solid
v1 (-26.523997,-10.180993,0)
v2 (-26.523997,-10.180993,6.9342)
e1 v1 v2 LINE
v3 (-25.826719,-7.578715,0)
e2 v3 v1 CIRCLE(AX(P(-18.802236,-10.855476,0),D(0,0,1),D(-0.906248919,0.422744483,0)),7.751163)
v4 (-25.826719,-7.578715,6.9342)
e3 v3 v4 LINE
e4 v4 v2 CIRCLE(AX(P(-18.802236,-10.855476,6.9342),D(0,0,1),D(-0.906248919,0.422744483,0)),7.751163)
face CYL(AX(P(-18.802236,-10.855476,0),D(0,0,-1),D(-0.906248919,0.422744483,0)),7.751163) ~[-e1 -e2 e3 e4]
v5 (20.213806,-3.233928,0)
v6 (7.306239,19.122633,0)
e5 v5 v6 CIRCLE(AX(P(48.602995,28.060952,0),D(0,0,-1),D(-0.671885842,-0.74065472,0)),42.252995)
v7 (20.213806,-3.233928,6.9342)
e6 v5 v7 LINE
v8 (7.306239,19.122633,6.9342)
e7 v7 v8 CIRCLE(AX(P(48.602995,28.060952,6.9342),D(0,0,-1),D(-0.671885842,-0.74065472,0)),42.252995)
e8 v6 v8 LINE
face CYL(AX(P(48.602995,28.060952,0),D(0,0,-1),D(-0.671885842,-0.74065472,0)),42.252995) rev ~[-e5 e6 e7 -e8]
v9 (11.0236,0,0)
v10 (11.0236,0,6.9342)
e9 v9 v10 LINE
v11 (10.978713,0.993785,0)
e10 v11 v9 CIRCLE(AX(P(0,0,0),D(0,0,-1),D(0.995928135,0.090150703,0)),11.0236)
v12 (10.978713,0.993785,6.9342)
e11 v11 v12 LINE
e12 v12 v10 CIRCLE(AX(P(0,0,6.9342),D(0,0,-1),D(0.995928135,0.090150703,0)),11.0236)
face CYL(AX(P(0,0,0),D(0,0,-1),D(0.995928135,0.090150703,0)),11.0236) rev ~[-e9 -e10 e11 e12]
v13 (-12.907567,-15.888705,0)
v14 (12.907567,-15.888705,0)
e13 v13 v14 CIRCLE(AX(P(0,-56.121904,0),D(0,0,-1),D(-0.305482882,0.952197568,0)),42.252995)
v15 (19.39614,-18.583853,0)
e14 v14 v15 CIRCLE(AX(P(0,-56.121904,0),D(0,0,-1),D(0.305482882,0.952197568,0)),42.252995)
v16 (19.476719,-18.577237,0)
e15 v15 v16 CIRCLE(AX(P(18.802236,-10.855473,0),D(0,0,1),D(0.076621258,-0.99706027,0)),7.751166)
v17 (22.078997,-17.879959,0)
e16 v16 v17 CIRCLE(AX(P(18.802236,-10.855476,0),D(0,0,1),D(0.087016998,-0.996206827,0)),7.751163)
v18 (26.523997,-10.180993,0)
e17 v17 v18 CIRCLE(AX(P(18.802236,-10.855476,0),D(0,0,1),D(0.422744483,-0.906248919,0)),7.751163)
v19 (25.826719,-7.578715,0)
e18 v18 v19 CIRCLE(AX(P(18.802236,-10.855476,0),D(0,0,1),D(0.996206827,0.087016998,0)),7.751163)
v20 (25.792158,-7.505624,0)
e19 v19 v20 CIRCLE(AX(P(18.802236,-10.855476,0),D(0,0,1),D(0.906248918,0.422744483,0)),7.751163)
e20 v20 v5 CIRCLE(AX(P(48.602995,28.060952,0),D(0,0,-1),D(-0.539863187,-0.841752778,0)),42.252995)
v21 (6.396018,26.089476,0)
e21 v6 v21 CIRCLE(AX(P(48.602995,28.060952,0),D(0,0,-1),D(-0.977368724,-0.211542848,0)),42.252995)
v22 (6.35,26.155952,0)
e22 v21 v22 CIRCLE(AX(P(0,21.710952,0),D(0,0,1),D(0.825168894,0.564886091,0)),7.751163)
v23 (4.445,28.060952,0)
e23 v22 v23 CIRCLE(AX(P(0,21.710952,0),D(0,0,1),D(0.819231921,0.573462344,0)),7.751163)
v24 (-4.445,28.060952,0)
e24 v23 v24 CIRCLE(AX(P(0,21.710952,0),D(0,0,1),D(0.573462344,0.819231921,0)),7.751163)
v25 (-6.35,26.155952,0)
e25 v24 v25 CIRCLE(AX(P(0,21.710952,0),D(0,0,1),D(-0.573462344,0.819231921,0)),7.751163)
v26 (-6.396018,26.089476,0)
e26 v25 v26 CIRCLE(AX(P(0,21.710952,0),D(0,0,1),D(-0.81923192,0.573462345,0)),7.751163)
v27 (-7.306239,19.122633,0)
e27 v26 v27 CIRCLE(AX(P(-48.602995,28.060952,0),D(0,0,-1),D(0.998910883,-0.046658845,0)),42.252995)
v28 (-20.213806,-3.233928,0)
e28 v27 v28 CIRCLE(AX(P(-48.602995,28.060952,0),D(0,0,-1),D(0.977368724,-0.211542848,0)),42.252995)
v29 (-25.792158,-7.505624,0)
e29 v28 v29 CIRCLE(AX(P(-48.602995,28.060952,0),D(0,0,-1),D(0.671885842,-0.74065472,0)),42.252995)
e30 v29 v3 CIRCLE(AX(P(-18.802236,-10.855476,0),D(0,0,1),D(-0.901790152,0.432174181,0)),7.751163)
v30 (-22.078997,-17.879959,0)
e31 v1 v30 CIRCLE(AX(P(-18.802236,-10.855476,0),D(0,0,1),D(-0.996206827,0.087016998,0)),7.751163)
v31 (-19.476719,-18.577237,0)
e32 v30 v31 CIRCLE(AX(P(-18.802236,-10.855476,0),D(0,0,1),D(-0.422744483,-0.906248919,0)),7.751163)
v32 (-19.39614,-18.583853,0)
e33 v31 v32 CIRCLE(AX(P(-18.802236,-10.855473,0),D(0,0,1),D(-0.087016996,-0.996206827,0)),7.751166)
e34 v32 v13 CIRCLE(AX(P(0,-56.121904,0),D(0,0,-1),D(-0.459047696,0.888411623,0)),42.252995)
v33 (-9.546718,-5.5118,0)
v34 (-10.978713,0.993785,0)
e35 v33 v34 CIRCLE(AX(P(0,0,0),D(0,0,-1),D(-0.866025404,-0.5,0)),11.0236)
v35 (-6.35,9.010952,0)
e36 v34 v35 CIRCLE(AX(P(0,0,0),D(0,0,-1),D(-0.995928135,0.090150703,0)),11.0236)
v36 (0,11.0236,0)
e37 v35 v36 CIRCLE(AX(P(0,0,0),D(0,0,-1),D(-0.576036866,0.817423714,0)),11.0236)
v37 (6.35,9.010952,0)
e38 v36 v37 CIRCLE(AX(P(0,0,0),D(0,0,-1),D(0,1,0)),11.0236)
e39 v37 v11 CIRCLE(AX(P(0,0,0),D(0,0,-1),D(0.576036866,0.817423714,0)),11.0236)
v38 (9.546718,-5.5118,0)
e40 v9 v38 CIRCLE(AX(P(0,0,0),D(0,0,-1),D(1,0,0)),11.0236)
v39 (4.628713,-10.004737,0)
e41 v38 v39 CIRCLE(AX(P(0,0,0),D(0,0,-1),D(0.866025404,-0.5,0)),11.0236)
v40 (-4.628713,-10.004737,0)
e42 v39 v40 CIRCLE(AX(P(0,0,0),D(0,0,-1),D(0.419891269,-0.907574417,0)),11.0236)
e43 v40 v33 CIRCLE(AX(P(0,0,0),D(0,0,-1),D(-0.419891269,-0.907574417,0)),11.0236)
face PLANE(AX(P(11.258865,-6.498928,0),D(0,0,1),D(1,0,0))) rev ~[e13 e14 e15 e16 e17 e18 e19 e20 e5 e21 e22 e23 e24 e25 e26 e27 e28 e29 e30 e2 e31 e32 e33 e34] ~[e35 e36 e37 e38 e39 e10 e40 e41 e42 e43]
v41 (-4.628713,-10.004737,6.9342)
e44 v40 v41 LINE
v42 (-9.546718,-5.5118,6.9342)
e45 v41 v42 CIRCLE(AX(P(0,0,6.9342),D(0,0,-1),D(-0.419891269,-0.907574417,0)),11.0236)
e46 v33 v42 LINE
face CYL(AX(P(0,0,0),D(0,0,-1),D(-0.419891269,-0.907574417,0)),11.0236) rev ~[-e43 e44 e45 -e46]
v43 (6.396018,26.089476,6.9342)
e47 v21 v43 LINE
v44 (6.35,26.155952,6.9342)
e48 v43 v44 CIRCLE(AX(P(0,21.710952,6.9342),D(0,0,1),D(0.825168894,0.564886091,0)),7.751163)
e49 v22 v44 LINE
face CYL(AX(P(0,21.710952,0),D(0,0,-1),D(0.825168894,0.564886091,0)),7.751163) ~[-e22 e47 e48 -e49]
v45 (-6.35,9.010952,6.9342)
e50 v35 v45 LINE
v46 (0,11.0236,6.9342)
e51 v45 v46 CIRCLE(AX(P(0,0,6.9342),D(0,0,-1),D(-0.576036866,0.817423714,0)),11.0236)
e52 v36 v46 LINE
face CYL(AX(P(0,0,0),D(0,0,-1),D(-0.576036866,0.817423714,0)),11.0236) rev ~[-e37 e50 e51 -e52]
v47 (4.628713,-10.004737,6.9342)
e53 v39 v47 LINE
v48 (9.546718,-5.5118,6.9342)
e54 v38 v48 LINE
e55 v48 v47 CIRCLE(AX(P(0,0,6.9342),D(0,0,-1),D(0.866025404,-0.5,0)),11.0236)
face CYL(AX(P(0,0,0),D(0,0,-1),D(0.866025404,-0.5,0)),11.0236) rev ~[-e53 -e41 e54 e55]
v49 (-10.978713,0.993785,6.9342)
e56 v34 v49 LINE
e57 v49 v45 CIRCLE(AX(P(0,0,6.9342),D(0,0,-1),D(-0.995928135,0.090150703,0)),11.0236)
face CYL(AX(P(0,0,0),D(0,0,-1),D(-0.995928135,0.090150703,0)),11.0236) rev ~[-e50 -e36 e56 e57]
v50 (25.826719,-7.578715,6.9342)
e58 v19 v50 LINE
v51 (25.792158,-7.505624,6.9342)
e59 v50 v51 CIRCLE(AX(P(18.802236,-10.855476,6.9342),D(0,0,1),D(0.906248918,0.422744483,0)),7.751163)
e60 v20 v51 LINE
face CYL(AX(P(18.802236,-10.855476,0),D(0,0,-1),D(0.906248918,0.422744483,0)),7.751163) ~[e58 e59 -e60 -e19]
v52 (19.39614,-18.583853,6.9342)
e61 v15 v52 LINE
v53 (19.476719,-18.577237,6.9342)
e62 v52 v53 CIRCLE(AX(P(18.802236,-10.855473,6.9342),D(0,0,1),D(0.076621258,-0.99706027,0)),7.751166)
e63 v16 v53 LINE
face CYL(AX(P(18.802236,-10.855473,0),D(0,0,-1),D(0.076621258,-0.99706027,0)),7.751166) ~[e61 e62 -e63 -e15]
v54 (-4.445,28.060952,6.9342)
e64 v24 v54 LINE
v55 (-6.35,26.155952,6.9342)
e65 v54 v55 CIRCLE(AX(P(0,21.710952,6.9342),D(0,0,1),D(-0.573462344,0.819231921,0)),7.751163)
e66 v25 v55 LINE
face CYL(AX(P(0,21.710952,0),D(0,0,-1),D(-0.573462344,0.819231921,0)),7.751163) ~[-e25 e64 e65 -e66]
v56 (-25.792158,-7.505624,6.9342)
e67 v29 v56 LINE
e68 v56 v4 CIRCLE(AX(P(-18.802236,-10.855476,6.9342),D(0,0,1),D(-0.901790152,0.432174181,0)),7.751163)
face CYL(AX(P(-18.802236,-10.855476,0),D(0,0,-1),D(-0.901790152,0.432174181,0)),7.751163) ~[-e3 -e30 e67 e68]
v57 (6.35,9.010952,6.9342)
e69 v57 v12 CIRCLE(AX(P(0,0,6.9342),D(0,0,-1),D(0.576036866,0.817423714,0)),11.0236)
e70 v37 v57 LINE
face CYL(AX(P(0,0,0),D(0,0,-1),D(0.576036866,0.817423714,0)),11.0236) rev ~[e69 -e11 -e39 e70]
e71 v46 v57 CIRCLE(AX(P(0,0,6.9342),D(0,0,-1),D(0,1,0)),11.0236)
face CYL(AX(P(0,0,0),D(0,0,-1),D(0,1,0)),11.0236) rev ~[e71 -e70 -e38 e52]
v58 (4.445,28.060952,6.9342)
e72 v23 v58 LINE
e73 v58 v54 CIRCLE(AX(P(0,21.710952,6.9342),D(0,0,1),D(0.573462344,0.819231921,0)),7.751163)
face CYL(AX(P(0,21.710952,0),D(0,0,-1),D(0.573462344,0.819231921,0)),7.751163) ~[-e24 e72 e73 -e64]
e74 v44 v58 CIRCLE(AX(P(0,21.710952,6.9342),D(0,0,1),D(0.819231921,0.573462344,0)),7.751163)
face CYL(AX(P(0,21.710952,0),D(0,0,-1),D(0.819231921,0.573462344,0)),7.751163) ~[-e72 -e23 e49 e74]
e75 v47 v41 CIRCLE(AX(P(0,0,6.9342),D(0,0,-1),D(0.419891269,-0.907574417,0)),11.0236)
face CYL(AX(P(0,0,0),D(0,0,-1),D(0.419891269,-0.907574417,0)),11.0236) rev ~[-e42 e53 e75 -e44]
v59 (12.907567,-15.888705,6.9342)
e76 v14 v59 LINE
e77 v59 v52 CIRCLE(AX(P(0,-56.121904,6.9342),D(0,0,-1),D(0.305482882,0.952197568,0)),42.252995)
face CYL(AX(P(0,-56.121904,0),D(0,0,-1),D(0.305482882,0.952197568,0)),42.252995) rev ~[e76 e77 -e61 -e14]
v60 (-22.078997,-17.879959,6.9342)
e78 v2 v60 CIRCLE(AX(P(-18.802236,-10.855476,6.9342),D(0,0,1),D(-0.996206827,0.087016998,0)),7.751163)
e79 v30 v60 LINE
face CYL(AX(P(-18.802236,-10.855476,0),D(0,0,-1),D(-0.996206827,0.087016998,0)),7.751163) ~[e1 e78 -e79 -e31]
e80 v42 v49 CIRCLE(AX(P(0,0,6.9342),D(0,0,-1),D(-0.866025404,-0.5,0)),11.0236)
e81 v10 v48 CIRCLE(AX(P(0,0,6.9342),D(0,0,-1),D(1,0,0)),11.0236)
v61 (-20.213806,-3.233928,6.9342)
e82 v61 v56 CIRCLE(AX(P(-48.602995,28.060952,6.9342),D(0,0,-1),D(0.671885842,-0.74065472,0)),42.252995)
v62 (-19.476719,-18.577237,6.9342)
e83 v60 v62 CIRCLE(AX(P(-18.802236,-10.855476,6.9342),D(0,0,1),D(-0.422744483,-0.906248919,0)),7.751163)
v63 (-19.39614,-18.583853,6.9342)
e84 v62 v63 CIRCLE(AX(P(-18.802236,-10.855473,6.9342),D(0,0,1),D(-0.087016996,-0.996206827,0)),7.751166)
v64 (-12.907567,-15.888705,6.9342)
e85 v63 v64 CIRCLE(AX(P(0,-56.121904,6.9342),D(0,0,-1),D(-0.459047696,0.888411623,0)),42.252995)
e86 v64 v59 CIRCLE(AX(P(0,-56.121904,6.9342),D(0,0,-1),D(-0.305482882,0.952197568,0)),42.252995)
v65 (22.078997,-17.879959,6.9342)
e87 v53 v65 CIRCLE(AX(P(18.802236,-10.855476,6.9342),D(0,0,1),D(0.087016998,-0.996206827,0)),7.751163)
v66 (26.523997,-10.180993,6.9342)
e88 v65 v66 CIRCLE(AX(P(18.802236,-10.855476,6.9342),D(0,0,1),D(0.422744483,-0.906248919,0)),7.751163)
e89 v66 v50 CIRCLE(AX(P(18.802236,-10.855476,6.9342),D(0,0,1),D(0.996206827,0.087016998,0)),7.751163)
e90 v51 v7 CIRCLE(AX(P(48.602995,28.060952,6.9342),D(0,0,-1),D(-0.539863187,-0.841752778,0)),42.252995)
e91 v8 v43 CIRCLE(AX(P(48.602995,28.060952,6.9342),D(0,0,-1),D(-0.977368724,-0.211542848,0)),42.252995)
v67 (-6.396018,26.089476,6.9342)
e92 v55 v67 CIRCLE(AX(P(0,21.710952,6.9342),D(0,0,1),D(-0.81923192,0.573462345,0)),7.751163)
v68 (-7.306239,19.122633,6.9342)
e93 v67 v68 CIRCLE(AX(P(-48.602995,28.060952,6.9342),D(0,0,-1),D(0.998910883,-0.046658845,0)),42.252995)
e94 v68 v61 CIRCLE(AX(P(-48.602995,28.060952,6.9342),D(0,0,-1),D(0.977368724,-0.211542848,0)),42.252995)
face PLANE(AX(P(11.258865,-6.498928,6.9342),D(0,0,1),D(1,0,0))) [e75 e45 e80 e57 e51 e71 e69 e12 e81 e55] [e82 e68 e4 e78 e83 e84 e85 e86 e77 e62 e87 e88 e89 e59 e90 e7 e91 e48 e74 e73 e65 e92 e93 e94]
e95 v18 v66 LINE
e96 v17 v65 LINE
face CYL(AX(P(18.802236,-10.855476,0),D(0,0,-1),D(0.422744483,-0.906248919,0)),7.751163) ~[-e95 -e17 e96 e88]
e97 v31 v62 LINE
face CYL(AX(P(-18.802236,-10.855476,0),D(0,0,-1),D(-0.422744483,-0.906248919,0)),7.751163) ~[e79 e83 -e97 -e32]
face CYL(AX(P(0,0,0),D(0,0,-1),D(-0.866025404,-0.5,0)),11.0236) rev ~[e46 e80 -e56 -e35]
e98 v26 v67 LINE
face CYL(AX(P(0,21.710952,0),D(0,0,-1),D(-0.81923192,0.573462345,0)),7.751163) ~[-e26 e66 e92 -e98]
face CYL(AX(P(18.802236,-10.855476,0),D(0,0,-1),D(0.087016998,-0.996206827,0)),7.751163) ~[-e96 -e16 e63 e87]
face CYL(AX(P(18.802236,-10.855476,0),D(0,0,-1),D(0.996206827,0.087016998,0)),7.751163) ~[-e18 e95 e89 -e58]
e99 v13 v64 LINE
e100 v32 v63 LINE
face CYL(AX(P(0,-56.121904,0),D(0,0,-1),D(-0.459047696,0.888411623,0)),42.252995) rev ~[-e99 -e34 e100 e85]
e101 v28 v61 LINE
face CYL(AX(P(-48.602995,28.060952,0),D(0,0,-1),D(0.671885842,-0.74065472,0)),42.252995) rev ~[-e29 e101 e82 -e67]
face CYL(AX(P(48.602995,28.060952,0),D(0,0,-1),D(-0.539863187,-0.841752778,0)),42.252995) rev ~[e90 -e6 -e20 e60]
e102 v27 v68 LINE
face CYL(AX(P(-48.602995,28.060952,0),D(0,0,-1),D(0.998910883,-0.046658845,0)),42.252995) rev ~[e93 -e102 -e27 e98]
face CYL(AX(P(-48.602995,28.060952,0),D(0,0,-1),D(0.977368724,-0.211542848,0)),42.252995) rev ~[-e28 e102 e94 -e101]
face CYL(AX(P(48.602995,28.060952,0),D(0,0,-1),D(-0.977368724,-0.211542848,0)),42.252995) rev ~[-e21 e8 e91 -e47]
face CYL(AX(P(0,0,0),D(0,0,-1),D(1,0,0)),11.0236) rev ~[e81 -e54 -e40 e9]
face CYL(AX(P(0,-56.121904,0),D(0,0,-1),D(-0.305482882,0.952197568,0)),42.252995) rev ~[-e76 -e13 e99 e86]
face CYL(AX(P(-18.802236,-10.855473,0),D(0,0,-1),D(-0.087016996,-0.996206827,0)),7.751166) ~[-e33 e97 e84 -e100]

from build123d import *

# Parameters (mm, degrees)
F1_DEPTH = 6.9342


with BuildPart() as f1:
    # F0 (on Top) → F1 (new body)
    with BuildSketch(Plane.XY):
        with BuildLine():
            ThreePointArc((10.978713393, 0.9937852859), (11.0123726308, 0.4973992365), (11.0236, 0))
            ThreePointArc((11.0236, 0), (10.6479799387, -2.8531176256), (9.5467176412, -5.5118))
            ThreePointArc((9.5467176412, -5.5118), (7.4352089911, -8.1386377373), (4.628713393, -10.0047373422))
            Line((4.628713393, -10.0047373422), (11.7777531012, -14.1322373422))
            ThreePointArc((11.7777531012, -14.1322373422), (12.0895321135, -6.9798946201), (18.1277531012, -3.1337147141))
            Line((18.1277531012, -3.1337147141), (10.978713393, 0.9937852859))
        make_face()
        with BuildLine():
            ThreePointArc((6.35, 9.0109520562), (9.5467176412, 5.5118), (10.978713393, 0.9937852859))
            Line((10.978713393, 0.9937852859), (18.1277531012, -3.1337147141))
            ThreePointArc((18.1277531012, -3.1337147141), (19.1741700395, -3.1132418489), (20.2138057566, -3.2339278992))
            ThreePointArc((20.2138057566, -3.2339278992), (12.0108278998, 6.9344547212), (7.3062391636, 19.1226332419))
            ThreePointArc((7.3062391636, 19.1226332419), (6.8909384905, 18.1619392751), (6.35, 17.2659520562))
            Line((6.35, 17.2659520562), (6.35, 9.0109520562))
        make_face()
        with BuildLine():
            ThreePointArc((0, 11.0236), (3.3306625371, 10.5083987374), (6.35, 9.0109520562))
            Line((6.35, 9.0109520562), (6.35, 17.2659520562))
            ThreePointArc((6.35, 17.2659520562), (0, 13.9597892403), (-6.35, 17.2659520562))
            Line((-6.35, 17.2659520562), (-6.35, 9.0109520562))
            ThreePointArc((-6.35, 9.0109520562), (-3.3306625371, 10.5083987374), (0, 11.0236))
        make_face()
        with BuildLine():
            ThreePointArc((20.2138057566, -3.2339278992), (19.1741700395, -3.1132418489), (18.1277531012, -3.1337147141))
            Line((18.1277531012, -3.1337147141), (25.8267189409, -7.5787147141))
            ThreePointArc((25.8267189409, -7.5787147141), (25.8095339268, -7.5421240909), (25.7921583133, -7.5056235914))
            ThreePointArc((25.7921583133, -7.5056235914), (22.9140380361, -5.4859265713), (20.2138057566, -3.2339278992))
        make_face()
        with BuildLine():
            Line((25.8267189409, -7.5787147141), (18.1277531012, -3.1337147141))
            ThreePointArc((18.1277531012, -3.1337147141), (12.0895321135, -6.9798946201), (11.7777531012, -14.1322373422))
            Line((11.7777531012, -14.1322373422), (19.4767189409, -18.5772373422))
            ThreePointArc((19.4767189409, -18.5772373422), (20.8083845795, -18.3425243759), (22.0789973351, -17.8799589479))
            Line((22.0789973351, -17.8799589479), (26.5239973351, -10.1809931083))
            ThreePointArc((26.5239973351, -10.1809931083), (26.2892843688, -8.8493274697), (25.8267189409, -7.5787147141))
        make_face()
        with BuildLine():
            Line((11.7777531012, -14.1322373422), (4.628713393, -10.0047373422))
            ThreePointArc((4.628713393, -10.0047373422), (0, -11.0236), (-4.628713393, -10.0047373422))
            Line((-4.628713393, -10.0047373422), (-11.7777531012, -14.1322373422))
            ThreePointArc((-11.7777531012, -14.1322373422), (-12.283231549, -15.0486974262), (-12.907566593, -15.8887053427))
            ThreePointArc((-12.907566593, -15.8887053427), (0, -13.8689094423), (12.907566593, -15.8887053427))
            ThreePointArc((12.907566593, -15.8887053427), (12.283231549, -15.0486974262), (11.7777531012, -14.1322373422))
        make_face()
        with BuildLine():
            ThreePointArc((-6.35, 17.2659520562), (0, 13.9597892403), (6.35, 17.2659520562))
            Line((6.35, 17.2659520562), (6.35, 26.1559520562))
            ThreePointArc((6.35, 26.1559520562), (5.4808997893, 27.1918518455), (4.445, 28.0609520562))
            Line((4.445, 28.0609520562), (-4.445, 28.0609520562))
            ThreePointArc((-4.445, 28.0609520562), (-5.4808997893, 27.1918518455), (-6.35, 26.1559520562))
            Line((-6.35, 26.1559520562), (-6.35, 17.2659520562))
        make_face()
        with BuildLine():
            Line((6.35, 26.1559520562), (6.35, 17.2659520562))
            ThreePointArc((6.35, 17.2659520562), (6.8909384905, 18.1619392751), (7.3062391636, 19.1226332419))
            ThreePointArc((7.3062391636, 19.1226332419), (6.706067244, 22.5871023282), (6.3960184553, 26.0894761135))
            ThreePointArc((6.3960184553, 26.0894761135), (6.3730959022, 26.1227740859), (6.35, 26.1559520562))
        make_face()
        with BuildLine():
            Line((19.4767189409, -18.5772373422), (11.7777531012, -14.1322373422))
            ThreePointArc((11.7777531012, -14.1322373422), (12.283231549, -15.0486974262), (12.907566593, -15.8887053427))
            ThreePointArc((12.907566593, -15.8887053427), (16.2079707921, -17.1011757569), (19.3961398581, -18.5838525221))
            ThreePointArc((19.3961398581, -18.5838525221), (19.4364380247, -18.580649995), (19.4767189409, -18.5772373422))
        make_face()
        with BuildLine():
            Line((-11.7777531012, -14.1322373422), (-4.628713393, -10.0047373422))
            ThreePointArc((-4.628713393, -10.0047373422), (-7.4352089911, -8.1386377373), (-9.5467176412, -5.5118))
            ThreePointArc((-9.5467176412, -5.5118), (-10.7658715282, -2.3697610001), (-10.978713393, 0.9937852859))
            Line((-10.978713393, 0.9937852859), (-18.1277531012, -3.1337147141))
            ThreePointArc((-18.1277531012, -3.1337147141), (-12.0895321135, -6.9798946201), (-11.7777531012, -14.1322373422))
        make_face()
        with BuildLine():
            ThreePointArc((-10.978713393, 0.9937852859), (-9.5467176412, 5.5118), (-6.35, 9.0109520562))
            Line((-6.35, 9.0109520562), (-6.35, 17.2659520562))
            ThreePointArc((-6.35, 17.2659520562), (-6.8909384905, 18.1619392751), (-7.3062391636, 19.1226332419))
            ThreePointArc((-7.3062391636, 19.1226332419), (-12.0108278998, 6.9344547212), (-20.2138057566, -3.2339278992))
            ThreePointArc((-20.2138057566, -3.2339278992), (-19.1741700395, -3.1132418489), (-18.1277531012, -3.1337147141))
            Line((-18.1277531012, -3.1337147141), (-10.978713393, 0.9937852859))
        make_face()
        with BuildLine():
            ThreePointArc((-7.3062391636, 19.1226332419), (-6.8909384905, 18.1619392751), (-6.35, 17.2659520562))
            Line((-6.35, 17.2659520562), (-6.35, 26.1559520562))
            ThreePointArc((-6.35, 26.1559520562), (-6.3730959022, 26.1227740859), (-6.3960184553, 26.0894761135))
            ThreePointArc((-6.3960184553, 26.0894761135), (-6.706067244, 22.5871023282), (-7.3062391636, 19.1226332419))
        make_face()
        with BuildLine():
            ThreePointArc((22.0789973351, -17.8799589479), (25.5149399286, -14.7310574361), (26.5239973351, -10.1809931083))
            Line((26.5239973351, -10.1809931083), (22.0789973351, -17.8799589479))
        make_face()
        with BuildLine():
            ThreePointArc((-12.907566593, -15.8887053427), (-12.283231549, -15.0486974262), (-11.7777531012, -14.1322373422))
            Line((-11.7777531012, -14.1322373422), (-19.4767189409, -18.5772373422))
            ThreePointArc((-19.4767189409, -18.5772373422), (-19.4364380247, -18.580649995), (-19.3961398581, -18.5838525221))
            ThreePointArc((-19.3961398581, -18.5838525221), (-16.2079707921, -17.1011757569), (-12.907566593, -15.8887053427))
        make_face()
        with BuildLine():
            Line((-19.4767189409, -18.5772373422), (-11.7777531012, -14.1322373422))
            ThreePointArc((-11.7777531012, -14.1322373422), (-12.0895321135, -6.9798946201), (-18.1277531012, -3.1337147141))
            Line((-18.1277531012, -3.1337147141), (-25.8267189409, -7.5787147141))
            ThreePointArc((-25.8267189409, -7.5787147141), (-26.2892843688, -8.8493274697), (-26.5239973351, -10.1809931083))
            Line((-26.5239973351, -10.1809931083), (-22.0789973351, -17.8799589479))
            ThreePointArc((-22.0789973351, -17.8799589479), (-20.8083845795, -18.3425243759), (-19.4767189409, -18.5772373422))
        make_face()
        with BuildLine():
            Line((-4.445, 28.0609520562), (4.445, 28.0609520562))
            ThreePointArc((4.445, 28.0609520562), (0, 29.4621148722), (-4.445, 28.0609520562))
        make_face()
        with BuildLine():
            Line((-25.8267189409, -7.5787147141), (-18.1277531012, -3.1337147141))
            ThreePointArc((-18.1277531012, -3.1337147141), (-19.1741700395, -3.1132418489), (-20.2138057566, -3.2339278992))
            ThreePointArc((-20.2138057566, -3.2339278992), (-22.9140380361, -5.4859265713), (-25.7921583133, -7.5056235914))
            ThreePointArc((-25.7921583133, -7.5056235914), (-25.8095339268, -7.5421240909), (-25.8267189409, -7.5787147141))
        make_face()
        with BuildLine():
            ThreePointArc((-26.5239973351, -10.1809931083), (-25.5149399286, -14.7310574361), (-22.0789973351, -17.8799589479))
            Line((-22.0789973351, -17.8799589479), (-26.5239973351, -10.1809931083))
        make_face()
    extrude(amount=F1_DEPTH)


solid = f1.part
